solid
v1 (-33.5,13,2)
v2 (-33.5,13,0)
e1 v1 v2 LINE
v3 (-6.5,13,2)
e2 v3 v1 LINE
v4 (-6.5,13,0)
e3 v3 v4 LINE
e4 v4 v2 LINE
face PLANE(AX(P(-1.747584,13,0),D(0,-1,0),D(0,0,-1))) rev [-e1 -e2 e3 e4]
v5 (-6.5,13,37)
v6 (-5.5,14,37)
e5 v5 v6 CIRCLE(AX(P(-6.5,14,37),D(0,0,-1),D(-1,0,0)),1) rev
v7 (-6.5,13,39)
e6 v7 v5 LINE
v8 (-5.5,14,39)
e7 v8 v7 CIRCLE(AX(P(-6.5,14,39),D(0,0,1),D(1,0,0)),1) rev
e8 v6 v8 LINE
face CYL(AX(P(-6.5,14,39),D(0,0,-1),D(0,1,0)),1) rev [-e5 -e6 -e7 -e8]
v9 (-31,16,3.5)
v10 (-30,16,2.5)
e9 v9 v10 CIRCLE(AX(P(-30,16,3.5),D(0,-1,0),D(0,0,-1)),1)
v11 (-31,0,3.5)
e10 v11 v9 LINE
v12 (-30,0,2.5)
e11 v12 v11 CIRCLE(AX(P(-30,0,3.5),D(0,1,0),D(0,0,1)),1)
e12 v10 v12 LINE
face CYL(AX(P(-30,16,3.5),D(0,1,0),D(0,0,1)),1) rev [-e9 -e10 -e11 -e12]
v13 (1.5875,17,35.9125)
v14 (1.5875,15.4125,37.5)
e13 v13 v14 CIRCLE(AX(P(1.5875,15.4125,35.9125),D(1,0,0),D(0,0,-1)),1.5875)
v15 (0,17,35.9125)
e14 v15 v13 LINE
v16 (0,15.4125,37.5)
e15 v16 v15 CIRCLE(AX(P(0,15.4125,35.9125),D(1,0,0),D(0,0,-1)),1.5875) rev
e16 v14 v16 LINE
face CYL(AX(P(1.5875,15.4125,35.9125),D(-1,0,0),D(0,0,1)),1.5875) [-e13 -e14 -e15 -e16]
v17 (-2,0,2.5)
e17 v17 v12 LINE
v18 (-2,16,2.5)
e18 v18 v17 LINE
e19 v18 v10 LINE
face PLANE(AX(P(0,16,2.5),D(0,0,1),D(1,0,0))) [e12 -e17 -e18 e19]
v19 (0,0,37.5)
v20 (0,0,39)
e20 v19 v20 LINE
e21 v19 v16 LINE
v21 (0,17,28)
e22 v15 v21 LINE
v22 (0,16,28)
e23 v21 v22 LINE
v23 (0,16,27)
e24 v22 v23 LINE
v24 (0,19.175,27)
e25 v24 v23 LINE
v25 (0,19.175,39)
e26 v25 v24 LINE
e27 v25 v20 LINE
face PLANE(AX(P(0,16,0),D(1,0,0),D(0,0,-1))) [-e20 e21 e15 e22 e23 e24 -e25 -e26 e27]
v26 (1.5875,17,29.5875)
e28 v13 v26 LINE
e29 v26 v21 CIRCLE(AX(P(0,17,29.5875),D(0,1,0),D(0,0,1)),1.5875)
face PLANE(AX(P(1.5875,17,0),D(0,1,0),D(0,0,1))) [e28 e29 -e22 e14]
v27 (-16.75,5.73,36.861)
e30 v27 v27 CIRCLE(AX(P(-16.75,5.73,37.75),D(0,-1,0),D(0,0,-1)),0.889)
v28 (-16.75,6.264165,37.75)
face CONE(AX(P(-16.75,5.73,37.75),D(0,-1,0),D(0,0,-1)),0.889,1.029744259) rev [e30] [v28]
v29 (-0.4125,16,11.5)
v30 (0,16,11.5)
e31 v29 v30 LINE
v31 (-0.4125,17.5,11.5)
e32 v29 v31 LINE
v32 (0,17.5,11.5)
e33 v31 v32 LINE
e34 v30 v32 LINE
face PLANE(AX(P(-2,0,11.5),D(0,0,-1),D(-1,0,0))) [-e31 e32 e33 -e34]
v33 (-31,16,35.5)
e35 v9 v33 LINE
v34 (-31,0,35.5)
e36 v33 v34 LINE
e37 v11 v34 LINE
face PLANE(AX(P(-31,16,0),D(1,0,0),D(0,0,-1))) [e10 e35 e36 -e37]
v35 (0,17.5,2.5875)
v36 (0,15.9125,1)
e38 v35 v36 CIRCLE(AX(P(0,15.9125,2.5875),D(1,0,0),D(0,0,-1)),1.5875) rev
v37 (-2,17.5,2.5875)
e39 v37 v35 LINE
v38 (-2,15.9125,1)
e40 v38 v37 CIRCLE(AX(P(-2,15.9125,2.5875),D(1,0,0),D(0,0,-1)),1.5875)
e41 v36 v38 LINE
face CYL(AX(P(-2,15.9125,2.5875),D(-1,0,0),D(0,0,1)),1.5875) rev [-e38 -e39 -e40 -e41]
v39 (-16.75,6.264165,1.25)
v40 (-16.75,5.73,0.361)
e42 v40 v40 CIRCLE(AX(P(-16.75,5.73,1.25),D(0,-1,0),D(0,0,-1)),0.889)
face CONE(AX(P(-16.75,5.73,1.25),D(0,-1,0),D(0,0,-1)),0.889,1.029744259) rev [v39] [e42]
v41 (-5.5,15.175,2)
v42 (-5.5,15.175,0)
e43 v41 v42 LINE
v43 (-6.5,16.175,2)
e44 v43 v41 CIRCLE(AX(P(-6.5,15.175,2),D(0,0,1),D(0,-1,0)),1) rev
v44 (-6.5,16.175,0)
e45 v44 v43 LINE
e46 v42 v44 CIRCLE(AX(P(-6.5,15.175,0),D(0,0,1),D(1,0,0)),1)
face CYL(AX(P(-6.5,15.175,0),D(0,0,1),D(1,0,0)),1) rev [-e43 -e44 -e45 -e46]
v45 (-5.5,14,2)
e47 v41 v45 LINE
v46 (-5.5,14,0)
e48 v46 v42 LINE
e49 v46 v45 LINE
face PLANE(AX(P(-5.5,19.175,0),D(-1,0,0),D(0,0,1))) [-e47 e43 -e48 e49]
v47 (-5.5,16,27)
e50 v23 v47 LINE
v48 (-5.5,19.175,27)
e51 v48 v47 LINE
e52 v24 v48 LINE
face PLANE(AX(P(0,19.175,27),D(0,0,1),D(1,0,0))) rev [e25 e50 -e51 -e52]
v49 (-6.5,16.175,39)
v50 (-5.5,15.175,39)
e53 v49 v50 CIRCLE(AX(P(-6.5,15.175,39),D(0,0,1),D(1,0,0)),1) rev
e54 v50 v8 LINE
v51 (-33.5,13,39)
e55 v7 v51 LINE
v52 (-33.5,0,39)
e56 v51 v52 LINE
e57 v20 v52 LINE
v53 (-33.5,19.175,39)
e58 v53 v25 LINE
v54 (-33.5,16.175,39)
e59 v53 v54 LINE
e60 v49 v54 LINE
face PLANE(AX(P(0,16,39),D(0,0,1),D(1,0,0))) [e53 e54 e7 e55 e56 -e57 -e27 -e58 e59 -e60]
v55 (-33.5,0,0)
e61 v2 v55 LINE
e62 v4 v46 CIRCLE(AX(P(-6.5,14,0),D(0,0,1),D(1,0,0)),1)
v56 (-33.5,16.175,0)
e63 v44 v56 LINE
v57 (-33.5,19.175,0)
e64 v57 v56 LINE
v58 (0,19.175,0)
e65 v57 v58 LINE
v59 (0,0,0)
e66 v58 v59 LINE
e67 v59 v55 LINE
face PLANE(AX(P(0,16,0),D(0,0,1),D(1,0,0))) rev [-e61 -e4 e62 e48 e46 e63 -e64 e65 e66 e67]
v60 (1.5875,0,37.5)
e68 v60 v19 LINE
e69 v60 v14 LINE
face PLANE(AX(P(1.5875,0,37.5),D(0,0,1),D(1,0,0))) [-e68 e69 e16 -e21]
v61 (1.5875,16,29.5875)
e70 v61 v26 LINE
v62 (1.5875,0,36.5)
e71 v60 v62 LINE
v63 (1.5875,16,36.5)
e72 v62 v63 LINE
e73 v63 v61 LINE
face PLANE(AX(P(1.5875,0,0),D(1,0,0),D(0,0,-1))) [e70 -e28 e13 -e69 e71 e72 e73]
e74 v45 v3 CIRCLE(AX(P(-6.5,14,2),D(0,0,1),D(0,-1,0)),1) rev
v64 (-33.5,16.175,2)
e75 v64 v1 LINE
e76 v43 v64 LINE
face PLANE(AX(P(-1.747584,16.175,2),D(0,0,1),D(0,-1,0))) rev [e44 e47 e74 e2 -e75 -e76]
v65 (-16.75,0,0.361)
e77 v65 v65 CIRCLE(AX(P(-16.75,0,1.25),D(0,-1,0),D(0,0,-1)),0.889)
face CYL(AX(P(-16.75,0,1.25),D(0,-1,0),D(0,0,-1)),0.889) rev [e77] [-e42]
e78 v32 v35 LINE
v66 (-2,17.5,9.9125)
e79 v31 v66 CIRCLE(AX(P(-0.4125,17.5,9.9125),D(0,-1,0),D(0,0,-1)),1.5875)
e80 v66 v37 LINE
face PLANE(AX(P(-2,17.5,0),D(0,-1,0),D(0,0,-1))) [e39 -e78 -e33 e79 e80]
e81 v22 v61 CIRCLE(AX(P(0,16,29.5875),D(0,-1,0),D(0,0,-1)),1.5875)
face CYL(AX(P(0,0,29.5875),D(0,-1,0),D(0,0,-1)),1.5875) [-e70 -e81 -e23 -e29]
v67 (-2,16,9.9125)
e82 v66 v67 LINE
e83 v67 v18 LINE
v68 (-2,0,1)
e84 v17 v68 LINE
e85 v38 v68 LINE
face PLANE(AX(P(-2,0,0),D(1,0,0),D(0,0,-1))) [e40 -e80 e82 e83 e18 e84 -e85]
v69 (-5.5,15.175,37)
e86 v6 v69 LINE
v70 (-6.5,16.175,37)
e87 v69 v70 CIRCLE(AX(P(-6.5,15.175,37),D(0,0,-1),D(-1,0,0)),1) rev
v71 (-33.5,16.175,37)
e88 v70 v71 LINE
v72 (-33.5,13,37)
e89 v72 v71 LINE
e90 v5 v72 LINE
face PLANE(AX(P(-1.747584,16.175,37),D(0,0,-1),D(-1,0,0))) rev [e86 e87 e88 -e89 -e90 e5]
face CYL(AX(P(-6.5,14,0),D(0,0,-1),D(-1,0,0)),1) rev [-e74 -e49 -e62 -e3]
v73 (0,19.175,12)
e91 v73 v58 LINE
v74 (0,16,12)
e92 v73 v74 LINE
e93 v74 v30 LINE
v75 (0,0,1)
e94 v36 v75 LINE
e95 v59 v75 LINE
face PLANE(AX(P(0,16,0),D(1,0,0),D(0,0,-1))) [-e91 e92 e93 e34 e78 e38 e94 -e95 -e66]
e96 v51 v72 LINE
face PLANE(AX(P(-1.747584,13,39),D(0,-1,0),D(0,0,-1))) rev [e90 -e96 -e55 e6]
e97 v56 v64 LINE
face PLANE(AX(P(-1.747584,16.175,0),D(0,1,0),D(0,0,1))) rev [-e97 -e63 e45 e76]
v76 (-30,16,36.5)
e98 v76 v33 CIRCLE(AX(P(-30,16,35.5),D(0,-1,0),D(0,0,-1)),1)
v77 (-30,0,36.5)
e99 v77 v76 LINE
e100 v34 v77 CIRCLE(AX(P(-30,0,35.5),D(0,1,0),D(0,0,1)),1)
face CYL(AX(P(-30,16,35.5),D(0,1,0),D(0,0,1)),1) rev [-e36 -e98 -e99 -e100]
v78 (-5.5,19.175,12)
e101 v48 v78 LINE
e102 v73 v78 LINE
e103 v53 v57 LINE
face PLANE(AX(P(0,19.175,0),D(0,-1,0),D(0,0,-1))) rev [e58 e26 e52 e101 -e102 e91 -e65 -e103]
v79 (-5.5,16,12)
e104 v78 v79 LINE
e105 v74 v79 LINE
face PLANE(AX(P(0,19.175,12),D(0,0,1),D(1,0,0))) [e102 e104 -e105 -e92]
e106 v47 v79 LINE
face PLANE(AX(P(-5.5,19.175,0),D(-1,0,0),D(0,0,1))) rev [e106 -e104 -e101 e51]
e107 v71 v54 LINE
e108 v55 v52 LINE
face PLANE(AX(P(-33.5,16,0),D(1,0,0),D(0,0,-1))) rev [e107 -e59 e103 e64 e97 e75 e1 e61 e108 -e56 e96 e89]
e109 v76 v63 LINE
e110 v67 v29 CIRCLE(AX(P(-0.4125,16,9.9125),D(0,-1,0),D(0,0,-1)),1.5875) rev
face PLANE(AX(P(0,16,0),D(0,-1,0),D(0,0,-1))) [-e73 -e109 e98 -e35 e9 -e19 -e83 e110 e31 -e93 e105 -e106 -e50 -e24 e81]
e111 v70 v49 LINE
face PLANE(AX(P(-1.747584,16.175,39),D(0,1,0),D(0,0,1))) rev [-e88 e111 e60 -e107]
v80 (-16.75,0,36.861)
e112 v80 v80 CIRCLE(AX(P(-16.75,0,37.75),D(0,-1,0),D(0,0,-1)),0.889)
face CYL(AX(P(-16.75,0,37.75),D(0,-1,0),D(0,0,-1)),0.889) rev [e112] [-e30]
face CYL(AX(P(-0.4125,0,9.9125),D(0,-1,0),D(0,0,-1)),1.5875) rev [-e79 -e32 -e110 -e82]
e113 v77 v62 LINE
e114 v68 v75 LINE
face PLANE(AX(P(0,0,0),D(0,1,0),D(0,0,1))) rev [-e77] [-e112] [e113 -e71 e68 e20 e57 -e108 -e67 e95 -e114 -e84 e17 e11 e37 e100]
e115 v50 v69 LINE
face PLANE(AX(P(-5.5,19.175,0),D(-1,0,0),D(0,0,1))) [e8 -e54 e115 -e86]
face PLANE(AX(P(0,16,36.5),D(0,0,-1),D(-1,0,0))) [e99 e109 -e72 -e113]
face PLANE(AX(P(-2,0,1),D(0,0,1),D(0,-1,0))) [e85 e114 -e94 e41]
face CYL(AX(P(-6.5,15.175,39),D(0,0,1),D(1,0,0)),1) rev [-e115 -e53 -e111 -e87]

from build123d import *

# Parameters (mm, degrees)
WALL_DEPTH                = 16
ROOF_START                = 16
ROOF_DEPTH                = 3.175
F_2_56_TAPPED_HOLE1_D     = 1.778
F_2_56_TAPPED_HOLE1_DEPTH = 5.73
F_2_56_TAPPED_HOLE1_TIP   = 0.53416509
BOSS_EXTRUDE1_DEPTH       = 1.5875
CUT_EXTRUDE3_DEPTH        = 2
FILLET1_R                 = 1.5875
RAIL_CUT_DEPTH            = 56.855288749
RAIL_CUT_DEPTH_BACK       = 28
SKETCH4_W                 = 2
SKETCH4_H                 = 3.175
FILLET2_R                 = 1


with BuildPart() as part:
    # MainSketch → Wall (new body)
    with BuildSketch(Plane(origin=(0, 0, 0), x_dir=(1, 0, 0), z_dir=(0, 1, 0))):
        Polygon((-31, -2.5), (0, -2.5), (0, 0), (-33.5, 0), (-33.5, -39), (0, -39), (0, -36.5), (-31, -36.5), align=None)
    extrude(amount=WALL_DEPTH)

    # MainSketch<3> → Roof (add)
    with BuildSketch(Plane(origin=(0, 0, 0), x_dir=(1, 0, 0), z_dir=(0, 1, 0)).offset(ROOF_START)):
        Polygon((0, -12), (0, 0), (-33.5, 0), (-33.5, -39), (0, -39), (0, -27), (-5.5, -27), (-5.5, -12), align=None)
    extrude(amount=ROOF_DEPTH)

    # #2-56 Tapped Hole1
    with Locations(Plane(origin=(-16.75, 0, 37.75), x_dir=(0, 0, -1), z_dir=(0, -1, 0))):
        with Locations((0, 0), (36.5, 0)):
            Hole(F_2_56_TAPPED_HOLE1_D / 2, depth=F_2_56_TAPPED_HOLE1_DEPTH)
            with Locations((0, 0, -(F_2_56_TAPPED_HOLE1_DEPTH + F_2_56_TAPPED_HOLE1_TIP / 2))):  # 118° drill point
                Cone(0, F_2_56_TAPPED_HOLE1_D / 2, F_2_56_TAPPED_HOLE1_TIP, mode=Mode.SUBTRACT)

    # Sketch3 → Boss-Extrude1 (add)
    with BuildSketch(Plane(origin=(0, 0, 0), x_dir=(0, 0, -1), z_dir=(1, 0, 0))):
        Polygon((-28, 17), (-28, 16), (-36.5, 16), (-36.5, 0), (-37.5, 0), (-37.5, 17), align=None)
    extrude(amount=BOSS_EXTRUDE1_DEPTH)

    # Sketch3<3> → Cut-Extrude3 (cut)
    with BuildSketch(Plane(origin=(0, 0, 0), x_dir=(0, 0, -1), z_dir=(1, 0, 0))):
        Polygon((-11.5, 16), (-11.5, 17.5), (-1, 17.5), (-1, 0), (-2.5, 0), (-2.5, 16), align=None)
    extrude(amount=-CUT_EXTRUDE3_DEPTH, mode=Mode.SUBTRACT)

    # Fillet1
    fillet1_edges = [part.edges().sort_by_distance(p)[0] for p in [
        (0.79375, 17, 37.5),
        (1.5875, 16.5, 28),
        (-1, 17.5, 1),
        (-2, 16.75, 11.5),
    ]]
    fillet(fillet1_edges, radius=FILLET1_R - 0.0001)  # a hair under: the kernel refuses the full size

    # Sketch4 → rail cut (cut, two sides: drawn at the far end of the back side and taken through both)
    with BuildSketch(Plane.ZY.offset(33.5).offset(-RAIL_CUT_DEPTH_BACK)):
        with Locations((1, 14.5875)):
            Rectangle(SKETCH4_W, SKETCH4_H)
        with Locations((38, 14.5875)):
            Rectangle(SKETCH4_W, SKETCH4_H)
    extrude(amount=RAIL_CUT_DEPTH + RAIL_CUT_DEPTH_BACK, mode=Mode.SUBTRACT)

    # Fillet2
    fillet2_edges = [part.edges().sort_by_distance(p)[0] for p in [
        (-5.5, 16.175, 1),
        (-5.5, 13, 1),
        (-5.5, 13, 38),
        (-5.5, 16.175, 38),
        (-31, 8, 2.5),
        (-31, 8, 36.5),
    ]]
    fillet(fillet2_edges, radius=FILLET2_R)


solid = part.part
